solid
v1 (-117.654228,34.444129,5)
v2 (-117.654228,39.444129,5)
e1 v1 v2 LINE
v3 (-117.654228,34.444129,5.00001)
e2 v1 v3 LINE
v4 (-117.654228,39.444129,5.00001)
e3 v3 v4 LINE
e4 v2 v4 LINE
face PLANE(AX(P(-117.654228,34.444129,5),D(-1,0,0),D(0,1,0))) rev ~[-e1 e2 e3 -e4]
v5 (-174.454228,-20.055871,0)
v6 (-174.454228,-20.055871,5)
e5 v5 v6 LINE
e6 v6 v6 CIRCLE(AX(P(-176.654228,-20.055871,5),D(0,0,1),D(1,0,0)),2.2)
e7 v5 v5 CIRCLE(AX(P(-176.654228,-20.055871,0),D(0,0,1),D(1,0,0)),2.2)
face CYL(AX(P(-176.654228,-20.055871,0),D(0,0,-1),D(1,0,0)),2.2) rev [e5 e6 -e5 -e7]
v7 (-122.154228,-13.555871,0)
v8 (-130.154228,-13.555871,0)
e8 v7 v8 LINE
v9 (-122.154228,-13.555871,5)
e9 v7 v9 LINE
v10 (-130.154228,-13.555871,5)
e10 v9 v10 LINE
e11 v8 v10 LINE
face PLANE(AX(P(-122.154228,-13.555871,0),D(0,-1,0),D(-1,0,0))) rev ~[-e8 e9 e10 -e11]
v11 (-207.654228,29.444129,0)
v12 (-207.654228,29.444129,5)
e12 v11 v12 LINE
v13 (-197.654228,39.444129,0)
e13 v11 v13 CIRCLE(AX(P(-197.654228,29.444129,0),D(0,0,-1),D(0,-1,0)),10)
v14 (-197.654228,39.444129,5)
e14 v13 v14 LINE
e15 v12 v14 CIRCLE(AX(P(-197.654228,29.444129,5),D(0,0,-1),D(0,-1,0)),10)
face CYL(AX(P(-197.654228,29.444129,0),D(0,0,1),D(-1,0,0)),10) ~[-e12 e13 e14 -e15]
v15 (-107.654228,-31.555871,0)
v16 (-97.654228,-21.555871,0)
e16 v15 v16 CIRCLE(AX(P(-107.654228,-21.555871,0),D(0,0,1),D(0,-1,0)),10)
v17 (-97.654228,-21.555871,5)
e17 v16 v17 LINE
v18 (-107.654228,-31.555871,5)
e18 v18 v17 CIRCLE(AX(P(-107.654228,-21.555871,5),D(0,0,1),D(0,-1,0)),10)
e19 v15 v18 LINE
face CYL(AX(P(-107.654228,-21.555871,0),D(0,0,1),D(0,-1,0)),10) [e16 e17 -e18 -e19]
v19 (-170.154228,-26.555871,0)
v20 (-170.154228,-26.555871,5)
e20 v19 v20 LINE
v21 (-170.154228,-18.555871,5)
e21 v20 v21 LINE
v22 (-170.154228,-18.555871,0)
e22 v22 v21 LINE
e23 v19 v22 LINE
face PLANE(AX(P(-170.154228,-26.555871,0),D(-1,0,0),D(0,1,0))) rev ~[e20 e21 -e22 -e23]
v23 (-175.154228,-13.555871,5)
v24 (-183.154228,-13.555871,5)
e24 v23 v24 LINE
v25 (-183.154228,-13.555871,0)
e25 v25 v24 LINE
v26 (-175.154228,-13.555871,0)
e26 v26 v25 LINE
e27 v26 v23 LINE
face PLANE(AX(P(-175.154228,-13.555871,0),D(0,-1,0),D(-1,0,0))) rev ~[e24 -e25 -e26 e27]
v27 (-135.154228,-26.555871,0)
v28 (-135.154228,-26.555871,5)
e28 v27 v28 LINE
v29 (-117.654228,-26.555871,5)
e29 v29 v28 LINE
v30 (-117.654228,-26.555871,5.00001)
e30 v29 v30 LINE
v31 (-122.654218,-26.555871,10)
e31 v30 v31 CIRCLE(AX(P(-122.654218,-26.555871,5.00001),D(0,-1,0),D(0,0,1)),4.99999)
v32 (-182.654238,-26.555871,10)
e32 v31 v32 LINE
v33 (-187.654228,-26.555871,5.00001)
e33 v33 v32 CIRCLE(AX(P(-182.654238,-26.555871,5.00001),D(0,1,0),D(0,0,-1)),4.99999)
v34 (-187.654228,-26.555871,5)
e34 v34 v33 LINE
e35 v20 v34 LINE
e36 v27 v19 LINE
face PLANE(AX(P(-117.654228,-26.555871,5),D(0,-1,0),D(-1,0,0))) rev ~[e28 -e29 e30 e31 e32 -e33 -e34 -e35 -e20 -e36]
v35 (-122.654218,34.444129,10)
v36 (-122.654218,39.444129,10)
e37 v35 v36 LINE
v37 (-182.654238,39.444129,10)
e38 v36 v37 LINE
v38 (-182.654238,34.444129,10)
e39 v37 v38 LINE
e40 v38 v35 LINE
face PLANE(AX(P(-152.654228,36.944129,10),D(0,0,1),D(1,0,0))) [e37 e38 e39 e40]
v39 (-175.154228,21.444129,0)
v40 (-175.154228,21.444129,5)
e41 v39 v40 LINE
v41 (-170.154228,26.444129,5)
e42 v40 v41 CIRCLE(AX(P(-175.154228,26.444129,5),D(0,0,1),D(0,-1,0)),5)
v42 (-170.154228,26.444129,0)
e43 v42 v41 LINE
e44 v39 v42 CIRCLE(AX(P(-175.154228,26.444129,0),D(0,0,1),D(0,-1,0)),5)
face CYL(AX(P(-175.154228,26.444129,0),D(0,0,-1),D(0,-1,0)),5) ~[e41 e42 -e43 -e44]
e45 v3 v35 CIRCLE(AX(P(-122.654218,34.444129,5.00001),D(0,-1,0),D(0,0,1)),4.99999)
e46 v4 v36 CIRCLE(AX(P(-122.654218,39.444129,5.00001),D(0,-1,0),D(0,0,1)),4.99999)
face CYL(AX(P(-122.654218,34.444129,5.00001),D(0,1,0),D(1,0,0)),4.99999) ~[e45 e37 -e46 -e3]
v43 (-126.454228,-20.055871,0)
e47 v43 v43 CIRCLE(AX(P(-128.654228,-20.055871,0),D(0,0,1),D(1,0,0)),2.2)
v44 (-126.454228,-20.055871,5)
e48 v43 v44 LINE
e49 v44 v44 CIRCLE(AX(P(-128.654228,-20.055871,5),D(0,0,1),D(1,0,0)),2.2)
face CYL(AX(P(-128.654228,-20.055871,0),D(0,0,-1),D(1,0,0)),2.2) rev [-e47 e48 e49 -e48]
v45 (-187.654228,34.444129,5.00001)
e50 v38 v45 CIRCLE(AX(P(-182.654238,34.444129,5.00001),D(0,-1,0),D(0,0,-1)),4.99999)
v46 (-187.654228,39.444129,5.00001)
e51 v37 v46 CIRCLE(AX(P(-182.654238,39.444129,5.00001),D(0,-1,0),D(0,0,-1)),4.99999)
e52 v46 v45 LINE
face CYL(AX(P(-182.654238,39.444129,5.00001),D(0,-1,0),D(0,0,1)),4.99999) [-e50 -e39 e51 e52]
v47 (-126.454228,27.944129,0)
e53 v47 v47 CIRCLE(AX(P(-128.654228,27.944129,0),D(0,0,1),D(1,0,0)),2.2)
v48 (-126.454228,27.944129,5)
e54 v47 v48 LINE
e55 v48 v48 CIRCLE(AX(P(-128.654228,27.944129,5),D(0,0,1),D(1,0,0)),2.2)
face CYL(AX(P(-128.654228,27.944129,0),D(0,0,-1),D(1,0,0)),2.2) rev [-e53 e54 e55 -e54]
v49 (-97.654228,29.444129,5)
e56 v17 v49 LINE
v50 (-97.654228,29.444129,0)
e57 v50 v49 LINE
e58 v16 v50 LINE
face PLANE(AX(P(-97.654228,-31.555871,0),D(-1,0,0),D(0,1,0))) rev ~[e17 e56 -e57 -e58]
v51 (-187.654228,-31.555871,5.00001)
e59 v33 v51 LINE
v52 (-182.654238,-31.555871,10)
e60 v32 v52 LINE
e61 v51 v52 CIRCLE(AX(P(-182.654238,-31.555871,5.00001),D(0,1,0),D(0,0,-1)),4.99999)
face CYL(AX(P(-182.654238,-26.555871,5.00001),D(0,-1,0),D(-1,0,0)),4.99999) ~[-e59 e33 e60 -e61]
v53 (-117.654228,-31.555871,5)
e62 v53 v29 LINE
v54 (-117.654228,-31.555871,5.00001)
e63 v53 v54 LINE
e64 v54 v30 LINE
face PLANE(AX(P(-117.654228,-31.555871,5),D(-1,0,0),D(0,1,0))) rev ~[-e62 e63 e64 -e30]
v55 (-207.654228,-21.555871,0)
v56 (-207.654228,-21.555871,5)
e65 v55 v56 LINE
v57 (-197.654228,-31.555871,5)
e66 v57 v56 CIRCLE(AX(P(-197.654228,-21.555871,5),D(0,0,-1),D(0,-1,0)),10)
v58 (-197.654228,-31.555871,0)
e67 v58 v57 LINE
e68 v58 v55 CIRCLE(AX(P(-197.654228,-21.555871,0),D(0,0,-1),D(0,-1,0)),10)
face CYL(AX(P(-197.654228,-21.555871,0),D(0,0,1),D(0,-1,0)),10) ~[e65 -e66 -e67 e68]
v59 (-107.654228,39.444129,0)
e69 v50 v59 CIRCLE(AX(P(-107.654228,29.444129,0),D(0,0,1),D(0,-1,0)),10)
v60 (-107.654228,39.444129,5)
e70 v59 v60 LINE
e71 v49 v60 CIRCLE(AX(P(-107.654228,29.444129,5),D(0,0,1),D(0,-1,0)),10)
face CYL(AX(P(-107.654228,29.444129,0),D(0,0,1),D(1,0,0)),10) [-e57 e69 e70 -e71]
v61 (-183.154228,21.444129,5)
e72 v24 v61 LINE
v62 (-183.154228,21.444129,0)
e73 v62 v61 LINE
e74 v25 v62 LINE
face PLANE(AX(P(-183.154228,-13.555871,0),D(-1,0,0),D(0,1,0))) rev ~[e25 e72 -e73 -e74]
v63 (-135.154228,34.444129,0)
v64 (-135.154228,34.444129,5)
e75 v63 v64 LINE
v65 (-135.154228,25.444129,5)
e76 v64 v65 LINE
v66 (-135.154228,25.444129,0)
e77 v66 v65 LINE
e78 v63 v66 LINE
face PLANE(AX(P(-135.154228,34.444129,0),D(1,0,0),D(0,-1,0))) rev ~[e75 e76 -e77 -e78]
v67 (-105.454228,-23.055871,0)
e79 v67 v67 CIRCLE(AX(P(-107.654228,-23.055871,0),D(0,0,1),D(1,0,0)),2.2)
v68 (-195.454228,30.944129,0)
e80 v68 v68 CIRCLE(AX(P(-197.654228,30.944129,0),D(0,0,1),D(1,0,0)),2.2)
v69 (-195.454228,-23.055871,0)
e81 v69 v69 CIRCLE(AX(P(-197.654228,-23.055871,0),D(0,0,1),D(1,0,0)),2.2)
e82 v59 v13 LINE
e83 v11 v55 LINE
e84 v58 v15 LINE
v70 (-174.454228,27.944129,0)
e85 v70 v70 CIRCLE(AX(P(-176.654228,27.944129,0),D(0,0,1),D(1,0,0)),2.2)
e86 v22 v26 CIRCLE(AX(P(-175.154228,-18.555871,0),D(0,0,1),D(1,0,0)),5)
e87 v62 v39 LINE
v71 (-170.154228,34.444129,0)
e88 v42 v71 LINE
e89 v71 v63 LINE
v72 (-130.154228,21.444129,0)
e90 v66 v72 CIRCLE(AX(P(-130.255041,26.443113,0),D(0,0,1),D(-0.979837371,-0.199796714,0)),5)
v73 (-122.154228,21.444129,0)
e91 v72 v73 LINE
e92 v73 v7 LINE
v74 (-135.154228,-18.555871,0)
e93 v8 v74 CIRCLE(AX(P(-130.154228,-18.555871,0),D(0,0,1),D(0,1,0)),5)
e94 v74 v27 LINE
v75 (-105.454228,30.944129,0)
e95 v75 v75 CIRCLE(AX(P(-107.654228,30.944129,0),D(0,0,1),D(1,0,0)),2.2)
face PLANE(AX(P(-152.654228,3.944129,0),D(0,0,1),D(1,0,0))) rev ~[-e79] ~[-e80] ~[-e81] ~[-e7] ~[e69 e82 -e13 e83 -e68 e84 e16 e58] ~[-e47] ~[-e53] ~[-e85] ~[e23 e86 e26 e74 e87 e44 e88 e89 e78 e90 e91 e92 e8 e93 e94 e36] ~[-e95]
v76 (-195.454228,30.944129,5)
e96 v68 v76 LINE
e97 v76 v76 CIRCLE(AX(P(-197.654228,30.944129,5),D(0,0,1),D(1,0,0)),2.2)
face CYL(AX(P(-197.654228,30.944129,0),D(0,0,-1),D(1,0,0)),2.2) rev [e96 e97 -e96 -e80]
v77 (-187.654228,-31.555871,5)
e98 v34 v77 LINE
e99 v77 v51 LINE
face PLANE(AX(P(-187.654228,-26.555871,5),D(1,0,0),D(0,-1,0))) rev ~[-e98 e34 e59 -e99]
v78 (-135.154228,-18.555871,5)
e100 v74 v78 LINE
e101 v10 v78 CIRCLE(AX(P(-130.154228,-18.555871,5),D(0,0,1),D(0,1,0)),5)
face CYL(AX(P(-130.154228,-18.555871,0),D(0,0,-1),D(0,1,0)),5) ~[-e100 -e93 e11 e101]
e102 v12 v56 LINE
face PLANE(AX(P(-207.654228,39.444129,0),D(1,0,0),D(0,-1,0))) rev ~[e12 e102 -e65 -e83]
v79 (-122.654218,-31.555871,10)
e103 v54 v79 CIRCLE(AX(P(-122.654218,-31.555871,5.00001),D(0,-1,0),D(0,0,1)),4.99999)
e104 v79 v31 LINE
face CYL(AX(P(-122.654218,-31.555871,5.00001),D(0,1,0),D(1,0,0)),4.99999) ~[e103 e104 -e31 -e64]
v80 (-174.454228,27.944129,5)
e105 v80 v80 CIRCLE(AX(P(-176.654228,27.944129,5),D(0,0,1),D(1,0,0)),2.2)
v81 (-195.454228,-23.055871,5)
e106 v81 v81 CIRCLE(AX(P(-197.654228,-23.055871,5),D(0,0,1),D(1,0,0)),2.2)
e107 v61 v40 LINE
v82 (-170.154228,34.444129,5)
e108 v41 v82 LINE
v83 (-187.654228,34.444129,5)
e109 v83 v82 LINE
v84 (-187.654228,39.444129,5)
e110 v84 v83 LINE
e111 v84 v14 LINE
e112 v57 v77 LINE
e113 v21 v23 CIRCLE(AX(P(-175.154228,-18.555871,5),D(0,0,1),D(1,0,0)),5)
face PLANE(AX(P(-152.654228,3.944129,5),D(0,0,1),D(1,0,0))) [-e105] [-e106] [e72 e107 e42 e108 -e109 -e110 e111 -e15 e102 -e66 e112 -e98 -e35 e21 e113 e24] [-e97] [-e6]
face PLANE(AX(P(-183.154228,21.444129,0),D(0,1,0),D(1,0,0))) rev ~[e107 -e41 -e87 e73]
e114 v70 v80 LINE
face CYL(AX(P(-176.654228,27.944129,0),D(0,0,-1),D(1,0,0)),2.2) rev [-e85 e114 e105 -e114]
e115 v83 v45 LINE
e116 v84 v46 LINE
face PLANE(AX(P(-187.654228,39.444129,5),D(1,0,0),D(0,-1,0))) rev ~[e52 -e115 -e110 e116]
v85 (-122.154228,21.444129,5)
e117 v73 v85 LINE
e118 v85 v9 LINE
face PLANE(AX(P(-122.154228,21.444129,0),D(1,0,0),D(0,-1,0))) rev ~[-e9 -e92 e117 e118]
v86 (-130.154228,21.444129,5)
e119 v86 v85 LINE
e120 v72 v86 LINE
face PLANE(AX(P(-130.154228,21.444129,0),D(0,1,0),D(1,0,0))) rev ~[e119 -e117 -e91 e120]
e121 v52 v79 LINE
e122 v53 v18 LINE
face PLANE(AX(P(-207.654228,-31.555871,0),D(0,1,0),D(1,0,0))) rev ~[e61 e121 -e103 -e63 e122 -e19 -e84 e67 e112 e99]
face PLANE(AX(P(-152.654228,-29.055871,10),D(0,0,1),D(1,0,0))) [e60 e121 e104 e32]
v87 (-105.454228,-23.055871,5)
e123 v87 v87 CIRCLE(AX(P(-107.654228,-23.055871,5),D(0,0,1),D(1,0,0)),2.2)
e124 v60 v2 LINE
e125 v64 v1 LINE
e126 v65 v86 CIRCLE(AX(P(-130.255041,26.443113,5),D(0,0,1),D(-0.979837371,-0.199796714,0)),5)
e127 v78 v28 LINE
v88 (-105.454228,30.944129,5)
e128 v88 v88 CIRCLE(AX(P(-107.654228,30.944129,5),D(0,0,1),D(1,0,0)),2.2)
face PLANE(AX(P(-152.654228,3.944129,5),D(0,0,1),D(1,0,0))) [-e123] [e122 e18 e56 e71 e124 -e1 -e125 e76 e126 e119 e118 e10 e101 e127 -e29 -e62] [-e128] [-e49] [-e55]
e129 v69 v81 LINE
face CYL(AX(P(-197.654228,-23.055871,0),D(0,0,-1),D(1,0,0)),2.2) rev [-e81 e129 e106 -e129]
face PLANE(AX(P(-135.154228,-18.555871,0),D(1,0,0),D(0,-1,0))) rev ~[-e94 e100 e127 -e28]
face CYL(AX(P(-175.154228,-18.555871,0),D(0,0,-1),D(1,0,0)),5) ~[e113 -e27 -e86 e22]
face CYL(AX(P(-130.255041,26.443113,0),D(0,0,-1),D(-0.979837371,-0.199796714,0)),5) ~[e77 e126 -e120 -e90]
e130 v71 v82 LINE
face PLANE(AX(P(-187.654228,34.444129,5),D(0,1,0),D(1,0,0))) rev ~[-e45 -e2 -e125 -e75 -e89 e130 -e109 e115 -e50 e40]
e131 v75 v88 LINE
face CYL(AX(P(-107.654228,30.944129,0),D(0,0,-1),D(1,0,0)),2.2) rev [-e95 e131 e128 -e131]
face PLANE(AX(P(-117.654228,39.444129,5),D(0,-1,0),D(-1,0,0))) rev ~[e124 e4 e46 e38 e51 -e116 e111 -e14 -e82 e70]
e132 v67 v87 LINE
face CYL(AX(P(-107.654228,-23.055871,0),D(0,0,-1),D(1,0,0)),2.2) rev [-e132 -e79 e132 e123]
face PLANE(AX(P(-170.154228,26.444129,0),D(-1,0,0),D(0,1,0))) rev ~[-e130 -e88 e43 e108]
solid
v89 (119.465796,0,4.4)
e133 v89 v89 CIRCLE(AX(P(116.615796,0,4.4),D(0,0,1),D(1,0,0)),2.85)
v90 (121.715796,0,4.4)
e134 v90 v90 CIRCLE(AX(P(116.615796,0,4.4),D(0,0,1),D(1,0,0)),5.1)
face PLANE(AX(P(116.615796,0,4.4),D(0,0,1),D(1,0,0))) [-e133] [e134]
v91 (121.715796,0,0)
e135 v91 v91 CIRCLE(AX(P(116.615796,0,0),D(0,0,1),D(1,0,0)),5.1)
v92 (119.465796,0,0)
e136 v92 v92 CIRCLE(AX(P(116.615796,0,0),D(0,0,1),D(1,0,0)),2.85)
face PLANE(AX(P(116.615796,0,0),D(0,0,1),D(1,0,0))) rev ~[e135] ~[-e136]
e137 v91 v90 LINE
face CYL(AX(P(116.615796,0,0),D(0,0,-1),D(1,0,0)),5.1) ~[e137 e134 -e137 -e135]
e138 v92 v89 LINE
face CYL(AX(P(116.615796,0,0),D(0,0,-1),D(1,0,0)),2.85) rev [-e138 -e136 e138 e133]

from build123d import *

# Parameters (mm, degrees)
F0_R     = 2.2
F1_DEPTH = 5
F2_R     = 10
F4_DEPTH = 5
F5_R     = 4.99999
F6_R     = 5.1
F6_R_2   = 2.85
F7_DEPTH = 4.4


# Not quite as in the source:
# - a fillet or chamfer is up to 0.001 mm smaller than in the source, because OpenCascade refuses the exact size


with BuildPart() as f1:
    # F0 (on Top) → F1 (new body)
    with BuildSketch(Plane.XY):
        Polygon((-207.6542276144, -31.5558707826), (-152.6542276144, -31.5558707826), (-97.6542276144, -31.5558707826), (-97.6542276144, 39.4441292174), (-152.6542276144, 39.4441292174), (-207.6542276144, 39.4441292174), align=None)
        with Locations((-197.6542276144, -23.0558707826)):
            Circle(F0_R, mode=Mode.SUBTRACT)
        with Locations((-176.6542276144, -20.0558707826)):
            Circle(F0_R, mode=Mode.SUBTRACT)
        with Locations((-128.6542276144, -20.0558707826)):
            Circle(F0_R, mode=Mode.SUBTRACT)
        with Locations((-107.6542276144, -23.0558707826)):
            Circle(F0_R, mode=Mode.SUBTRACT)
        with Locations((-197.6542276144, 30.9441292174)):
            Circle(F0_R, mode=Mode.SUBTRACT)
        with Locations((-176.6542276144, 27.9441292174)):
            Circle(F0_R, mode=Mode.SUBTRACT)
        with BuildLine():
            Line((-175.1542276144, -13.5558707826), (-183.1542276144, -13.5558707826))
            Line((-183.1542276144, -13.5558707826), (-183.1542276144, 21.4441292174))
            Line((-183.1542276144, 21.4441292174), (-175.1542276144, 21.4441292174))
            ThreePointArc((-175.1542276144, 21.4441292174), (-171.6186937085, 22.9085953115), (-170.1542276144, 26.4441292174))
            Line((-170.1542276144, 26.4441292174), (-170.1542276144, 34.4441292174))
            Line((-170.1542276144, 34.4441292174), (-135.1542276144, 34.4441292174))
            Line((-135.1542276144, 34.4441292174), (-135.1542276144, 25.4441292174))
            ThreePointArc((-135.1542276144, 25.4441292174), (-133.3785159981, 22.5387687378), (-130.1542276144, 21.4441292174))
            Line((-130.1542276144, 21.4441292174), (-122.1542276144, 21.4441292174))
            Line((-122.1542276144, 21.4441292174), (-122.1542276144, -13.5558707826))
            Line((-122.1542276144, -13.5558707826), (-130.1542276144, -13.5558707826))
            ThreePointArc((-130.1542276144, -13.5558707826), (-133.6897615203, -15.0203368767), (-135.1542276144, -18.5558707826))
            Line((-135.1542276144, -18.5558707826), (-135.1542276144, -26.5558707826))
            Line((-135.1542276144, -26.5558707826), (-170.1542276144, -26.5558707826))
            Line((-170.1542276144, -26.5558707826), (-170.1542276144, -18.5558707826))
            ThreePointArc((-170.1542276144, -18.5558707826), (-171.6186937085, -15.0203368767), (-175.1542276144, -13.5558707826))
        make_face(mode=Mode.SUBTRACT)
        with Locations((-128.6542276144, 27.9441292174)):
            Circle(F0_R, mode=Mode.SUBTRACT)
        with Locations((-107.6542276144, 30.9441292174)):
            Circle(F0_R, mode=Mode.SUBTRACT)
    extrude(amount=F1_DEPTH)

    # F2
    f2_edges = [f1.edges().sort_by_distance(p)[0] for p in [
        (-207.654228, -31.555871, 2.5),
        (-207.654228, 39.444129, 2.5),
        (-97.654228, -31.555871, 2.5),
        (-97.654228, 39.444129, 2.5),
    ]]
    fillet(f2_edges, radius=F2_R)

    # F3 (on face) → F4 (join)
    with BuildSketch(Plane.XY.offset(5)):
        Polygon((-117.6542276144, 34.4441292174), (-117.6542276144, 39.4441292174), (-187.6542276144, 39.4441292174), (-187.6542276144, 34.4441292174), (-170.1542276144, 34.4441292174), (-135.1542276144, 34.4441292174), align=None)
        Polygon((-117.6542276144, -26.5558707826), (-135.1542276144, -26.5558707826), (-170.1542276144, -26.5558707826), (-187.6542276144, -26.5558707826), (-187.6542276144, -31.5558707826), (-117.6542276144, -31.5558707826), align=None)
    extrude(amount=F4_DEPTH)

    # F5 (radius 5 in the source; OpenCascade refuses exactly that, so slightly less here)
    f5_edges = [f1.edges().sort_by_distance(p)[0] for p in [
        (-187.654228, -29.055871, 10),
        (-117.654228, -29.055871, 10),
        (-117.654228, 36.944129, 10),
        (-187.654228, 36.944129, 10),
    ]]
    fillet(f5_edges, radius=F5_R)


with BuildPart() as f7:
    # F6 (on Top) → F7 (new body)
    with BuildSketch(Plane.XY):
        with Locations((116.6157959732, 0)):
            Circle(F6_R)
        with Locations((116.6157959732, 0)):
            Circle(F6_R_2, mode=Mode.SUBTRACT)
    extrude(amount=F7_DEPTH)


solid = Compound([f1.part, f7.part])
